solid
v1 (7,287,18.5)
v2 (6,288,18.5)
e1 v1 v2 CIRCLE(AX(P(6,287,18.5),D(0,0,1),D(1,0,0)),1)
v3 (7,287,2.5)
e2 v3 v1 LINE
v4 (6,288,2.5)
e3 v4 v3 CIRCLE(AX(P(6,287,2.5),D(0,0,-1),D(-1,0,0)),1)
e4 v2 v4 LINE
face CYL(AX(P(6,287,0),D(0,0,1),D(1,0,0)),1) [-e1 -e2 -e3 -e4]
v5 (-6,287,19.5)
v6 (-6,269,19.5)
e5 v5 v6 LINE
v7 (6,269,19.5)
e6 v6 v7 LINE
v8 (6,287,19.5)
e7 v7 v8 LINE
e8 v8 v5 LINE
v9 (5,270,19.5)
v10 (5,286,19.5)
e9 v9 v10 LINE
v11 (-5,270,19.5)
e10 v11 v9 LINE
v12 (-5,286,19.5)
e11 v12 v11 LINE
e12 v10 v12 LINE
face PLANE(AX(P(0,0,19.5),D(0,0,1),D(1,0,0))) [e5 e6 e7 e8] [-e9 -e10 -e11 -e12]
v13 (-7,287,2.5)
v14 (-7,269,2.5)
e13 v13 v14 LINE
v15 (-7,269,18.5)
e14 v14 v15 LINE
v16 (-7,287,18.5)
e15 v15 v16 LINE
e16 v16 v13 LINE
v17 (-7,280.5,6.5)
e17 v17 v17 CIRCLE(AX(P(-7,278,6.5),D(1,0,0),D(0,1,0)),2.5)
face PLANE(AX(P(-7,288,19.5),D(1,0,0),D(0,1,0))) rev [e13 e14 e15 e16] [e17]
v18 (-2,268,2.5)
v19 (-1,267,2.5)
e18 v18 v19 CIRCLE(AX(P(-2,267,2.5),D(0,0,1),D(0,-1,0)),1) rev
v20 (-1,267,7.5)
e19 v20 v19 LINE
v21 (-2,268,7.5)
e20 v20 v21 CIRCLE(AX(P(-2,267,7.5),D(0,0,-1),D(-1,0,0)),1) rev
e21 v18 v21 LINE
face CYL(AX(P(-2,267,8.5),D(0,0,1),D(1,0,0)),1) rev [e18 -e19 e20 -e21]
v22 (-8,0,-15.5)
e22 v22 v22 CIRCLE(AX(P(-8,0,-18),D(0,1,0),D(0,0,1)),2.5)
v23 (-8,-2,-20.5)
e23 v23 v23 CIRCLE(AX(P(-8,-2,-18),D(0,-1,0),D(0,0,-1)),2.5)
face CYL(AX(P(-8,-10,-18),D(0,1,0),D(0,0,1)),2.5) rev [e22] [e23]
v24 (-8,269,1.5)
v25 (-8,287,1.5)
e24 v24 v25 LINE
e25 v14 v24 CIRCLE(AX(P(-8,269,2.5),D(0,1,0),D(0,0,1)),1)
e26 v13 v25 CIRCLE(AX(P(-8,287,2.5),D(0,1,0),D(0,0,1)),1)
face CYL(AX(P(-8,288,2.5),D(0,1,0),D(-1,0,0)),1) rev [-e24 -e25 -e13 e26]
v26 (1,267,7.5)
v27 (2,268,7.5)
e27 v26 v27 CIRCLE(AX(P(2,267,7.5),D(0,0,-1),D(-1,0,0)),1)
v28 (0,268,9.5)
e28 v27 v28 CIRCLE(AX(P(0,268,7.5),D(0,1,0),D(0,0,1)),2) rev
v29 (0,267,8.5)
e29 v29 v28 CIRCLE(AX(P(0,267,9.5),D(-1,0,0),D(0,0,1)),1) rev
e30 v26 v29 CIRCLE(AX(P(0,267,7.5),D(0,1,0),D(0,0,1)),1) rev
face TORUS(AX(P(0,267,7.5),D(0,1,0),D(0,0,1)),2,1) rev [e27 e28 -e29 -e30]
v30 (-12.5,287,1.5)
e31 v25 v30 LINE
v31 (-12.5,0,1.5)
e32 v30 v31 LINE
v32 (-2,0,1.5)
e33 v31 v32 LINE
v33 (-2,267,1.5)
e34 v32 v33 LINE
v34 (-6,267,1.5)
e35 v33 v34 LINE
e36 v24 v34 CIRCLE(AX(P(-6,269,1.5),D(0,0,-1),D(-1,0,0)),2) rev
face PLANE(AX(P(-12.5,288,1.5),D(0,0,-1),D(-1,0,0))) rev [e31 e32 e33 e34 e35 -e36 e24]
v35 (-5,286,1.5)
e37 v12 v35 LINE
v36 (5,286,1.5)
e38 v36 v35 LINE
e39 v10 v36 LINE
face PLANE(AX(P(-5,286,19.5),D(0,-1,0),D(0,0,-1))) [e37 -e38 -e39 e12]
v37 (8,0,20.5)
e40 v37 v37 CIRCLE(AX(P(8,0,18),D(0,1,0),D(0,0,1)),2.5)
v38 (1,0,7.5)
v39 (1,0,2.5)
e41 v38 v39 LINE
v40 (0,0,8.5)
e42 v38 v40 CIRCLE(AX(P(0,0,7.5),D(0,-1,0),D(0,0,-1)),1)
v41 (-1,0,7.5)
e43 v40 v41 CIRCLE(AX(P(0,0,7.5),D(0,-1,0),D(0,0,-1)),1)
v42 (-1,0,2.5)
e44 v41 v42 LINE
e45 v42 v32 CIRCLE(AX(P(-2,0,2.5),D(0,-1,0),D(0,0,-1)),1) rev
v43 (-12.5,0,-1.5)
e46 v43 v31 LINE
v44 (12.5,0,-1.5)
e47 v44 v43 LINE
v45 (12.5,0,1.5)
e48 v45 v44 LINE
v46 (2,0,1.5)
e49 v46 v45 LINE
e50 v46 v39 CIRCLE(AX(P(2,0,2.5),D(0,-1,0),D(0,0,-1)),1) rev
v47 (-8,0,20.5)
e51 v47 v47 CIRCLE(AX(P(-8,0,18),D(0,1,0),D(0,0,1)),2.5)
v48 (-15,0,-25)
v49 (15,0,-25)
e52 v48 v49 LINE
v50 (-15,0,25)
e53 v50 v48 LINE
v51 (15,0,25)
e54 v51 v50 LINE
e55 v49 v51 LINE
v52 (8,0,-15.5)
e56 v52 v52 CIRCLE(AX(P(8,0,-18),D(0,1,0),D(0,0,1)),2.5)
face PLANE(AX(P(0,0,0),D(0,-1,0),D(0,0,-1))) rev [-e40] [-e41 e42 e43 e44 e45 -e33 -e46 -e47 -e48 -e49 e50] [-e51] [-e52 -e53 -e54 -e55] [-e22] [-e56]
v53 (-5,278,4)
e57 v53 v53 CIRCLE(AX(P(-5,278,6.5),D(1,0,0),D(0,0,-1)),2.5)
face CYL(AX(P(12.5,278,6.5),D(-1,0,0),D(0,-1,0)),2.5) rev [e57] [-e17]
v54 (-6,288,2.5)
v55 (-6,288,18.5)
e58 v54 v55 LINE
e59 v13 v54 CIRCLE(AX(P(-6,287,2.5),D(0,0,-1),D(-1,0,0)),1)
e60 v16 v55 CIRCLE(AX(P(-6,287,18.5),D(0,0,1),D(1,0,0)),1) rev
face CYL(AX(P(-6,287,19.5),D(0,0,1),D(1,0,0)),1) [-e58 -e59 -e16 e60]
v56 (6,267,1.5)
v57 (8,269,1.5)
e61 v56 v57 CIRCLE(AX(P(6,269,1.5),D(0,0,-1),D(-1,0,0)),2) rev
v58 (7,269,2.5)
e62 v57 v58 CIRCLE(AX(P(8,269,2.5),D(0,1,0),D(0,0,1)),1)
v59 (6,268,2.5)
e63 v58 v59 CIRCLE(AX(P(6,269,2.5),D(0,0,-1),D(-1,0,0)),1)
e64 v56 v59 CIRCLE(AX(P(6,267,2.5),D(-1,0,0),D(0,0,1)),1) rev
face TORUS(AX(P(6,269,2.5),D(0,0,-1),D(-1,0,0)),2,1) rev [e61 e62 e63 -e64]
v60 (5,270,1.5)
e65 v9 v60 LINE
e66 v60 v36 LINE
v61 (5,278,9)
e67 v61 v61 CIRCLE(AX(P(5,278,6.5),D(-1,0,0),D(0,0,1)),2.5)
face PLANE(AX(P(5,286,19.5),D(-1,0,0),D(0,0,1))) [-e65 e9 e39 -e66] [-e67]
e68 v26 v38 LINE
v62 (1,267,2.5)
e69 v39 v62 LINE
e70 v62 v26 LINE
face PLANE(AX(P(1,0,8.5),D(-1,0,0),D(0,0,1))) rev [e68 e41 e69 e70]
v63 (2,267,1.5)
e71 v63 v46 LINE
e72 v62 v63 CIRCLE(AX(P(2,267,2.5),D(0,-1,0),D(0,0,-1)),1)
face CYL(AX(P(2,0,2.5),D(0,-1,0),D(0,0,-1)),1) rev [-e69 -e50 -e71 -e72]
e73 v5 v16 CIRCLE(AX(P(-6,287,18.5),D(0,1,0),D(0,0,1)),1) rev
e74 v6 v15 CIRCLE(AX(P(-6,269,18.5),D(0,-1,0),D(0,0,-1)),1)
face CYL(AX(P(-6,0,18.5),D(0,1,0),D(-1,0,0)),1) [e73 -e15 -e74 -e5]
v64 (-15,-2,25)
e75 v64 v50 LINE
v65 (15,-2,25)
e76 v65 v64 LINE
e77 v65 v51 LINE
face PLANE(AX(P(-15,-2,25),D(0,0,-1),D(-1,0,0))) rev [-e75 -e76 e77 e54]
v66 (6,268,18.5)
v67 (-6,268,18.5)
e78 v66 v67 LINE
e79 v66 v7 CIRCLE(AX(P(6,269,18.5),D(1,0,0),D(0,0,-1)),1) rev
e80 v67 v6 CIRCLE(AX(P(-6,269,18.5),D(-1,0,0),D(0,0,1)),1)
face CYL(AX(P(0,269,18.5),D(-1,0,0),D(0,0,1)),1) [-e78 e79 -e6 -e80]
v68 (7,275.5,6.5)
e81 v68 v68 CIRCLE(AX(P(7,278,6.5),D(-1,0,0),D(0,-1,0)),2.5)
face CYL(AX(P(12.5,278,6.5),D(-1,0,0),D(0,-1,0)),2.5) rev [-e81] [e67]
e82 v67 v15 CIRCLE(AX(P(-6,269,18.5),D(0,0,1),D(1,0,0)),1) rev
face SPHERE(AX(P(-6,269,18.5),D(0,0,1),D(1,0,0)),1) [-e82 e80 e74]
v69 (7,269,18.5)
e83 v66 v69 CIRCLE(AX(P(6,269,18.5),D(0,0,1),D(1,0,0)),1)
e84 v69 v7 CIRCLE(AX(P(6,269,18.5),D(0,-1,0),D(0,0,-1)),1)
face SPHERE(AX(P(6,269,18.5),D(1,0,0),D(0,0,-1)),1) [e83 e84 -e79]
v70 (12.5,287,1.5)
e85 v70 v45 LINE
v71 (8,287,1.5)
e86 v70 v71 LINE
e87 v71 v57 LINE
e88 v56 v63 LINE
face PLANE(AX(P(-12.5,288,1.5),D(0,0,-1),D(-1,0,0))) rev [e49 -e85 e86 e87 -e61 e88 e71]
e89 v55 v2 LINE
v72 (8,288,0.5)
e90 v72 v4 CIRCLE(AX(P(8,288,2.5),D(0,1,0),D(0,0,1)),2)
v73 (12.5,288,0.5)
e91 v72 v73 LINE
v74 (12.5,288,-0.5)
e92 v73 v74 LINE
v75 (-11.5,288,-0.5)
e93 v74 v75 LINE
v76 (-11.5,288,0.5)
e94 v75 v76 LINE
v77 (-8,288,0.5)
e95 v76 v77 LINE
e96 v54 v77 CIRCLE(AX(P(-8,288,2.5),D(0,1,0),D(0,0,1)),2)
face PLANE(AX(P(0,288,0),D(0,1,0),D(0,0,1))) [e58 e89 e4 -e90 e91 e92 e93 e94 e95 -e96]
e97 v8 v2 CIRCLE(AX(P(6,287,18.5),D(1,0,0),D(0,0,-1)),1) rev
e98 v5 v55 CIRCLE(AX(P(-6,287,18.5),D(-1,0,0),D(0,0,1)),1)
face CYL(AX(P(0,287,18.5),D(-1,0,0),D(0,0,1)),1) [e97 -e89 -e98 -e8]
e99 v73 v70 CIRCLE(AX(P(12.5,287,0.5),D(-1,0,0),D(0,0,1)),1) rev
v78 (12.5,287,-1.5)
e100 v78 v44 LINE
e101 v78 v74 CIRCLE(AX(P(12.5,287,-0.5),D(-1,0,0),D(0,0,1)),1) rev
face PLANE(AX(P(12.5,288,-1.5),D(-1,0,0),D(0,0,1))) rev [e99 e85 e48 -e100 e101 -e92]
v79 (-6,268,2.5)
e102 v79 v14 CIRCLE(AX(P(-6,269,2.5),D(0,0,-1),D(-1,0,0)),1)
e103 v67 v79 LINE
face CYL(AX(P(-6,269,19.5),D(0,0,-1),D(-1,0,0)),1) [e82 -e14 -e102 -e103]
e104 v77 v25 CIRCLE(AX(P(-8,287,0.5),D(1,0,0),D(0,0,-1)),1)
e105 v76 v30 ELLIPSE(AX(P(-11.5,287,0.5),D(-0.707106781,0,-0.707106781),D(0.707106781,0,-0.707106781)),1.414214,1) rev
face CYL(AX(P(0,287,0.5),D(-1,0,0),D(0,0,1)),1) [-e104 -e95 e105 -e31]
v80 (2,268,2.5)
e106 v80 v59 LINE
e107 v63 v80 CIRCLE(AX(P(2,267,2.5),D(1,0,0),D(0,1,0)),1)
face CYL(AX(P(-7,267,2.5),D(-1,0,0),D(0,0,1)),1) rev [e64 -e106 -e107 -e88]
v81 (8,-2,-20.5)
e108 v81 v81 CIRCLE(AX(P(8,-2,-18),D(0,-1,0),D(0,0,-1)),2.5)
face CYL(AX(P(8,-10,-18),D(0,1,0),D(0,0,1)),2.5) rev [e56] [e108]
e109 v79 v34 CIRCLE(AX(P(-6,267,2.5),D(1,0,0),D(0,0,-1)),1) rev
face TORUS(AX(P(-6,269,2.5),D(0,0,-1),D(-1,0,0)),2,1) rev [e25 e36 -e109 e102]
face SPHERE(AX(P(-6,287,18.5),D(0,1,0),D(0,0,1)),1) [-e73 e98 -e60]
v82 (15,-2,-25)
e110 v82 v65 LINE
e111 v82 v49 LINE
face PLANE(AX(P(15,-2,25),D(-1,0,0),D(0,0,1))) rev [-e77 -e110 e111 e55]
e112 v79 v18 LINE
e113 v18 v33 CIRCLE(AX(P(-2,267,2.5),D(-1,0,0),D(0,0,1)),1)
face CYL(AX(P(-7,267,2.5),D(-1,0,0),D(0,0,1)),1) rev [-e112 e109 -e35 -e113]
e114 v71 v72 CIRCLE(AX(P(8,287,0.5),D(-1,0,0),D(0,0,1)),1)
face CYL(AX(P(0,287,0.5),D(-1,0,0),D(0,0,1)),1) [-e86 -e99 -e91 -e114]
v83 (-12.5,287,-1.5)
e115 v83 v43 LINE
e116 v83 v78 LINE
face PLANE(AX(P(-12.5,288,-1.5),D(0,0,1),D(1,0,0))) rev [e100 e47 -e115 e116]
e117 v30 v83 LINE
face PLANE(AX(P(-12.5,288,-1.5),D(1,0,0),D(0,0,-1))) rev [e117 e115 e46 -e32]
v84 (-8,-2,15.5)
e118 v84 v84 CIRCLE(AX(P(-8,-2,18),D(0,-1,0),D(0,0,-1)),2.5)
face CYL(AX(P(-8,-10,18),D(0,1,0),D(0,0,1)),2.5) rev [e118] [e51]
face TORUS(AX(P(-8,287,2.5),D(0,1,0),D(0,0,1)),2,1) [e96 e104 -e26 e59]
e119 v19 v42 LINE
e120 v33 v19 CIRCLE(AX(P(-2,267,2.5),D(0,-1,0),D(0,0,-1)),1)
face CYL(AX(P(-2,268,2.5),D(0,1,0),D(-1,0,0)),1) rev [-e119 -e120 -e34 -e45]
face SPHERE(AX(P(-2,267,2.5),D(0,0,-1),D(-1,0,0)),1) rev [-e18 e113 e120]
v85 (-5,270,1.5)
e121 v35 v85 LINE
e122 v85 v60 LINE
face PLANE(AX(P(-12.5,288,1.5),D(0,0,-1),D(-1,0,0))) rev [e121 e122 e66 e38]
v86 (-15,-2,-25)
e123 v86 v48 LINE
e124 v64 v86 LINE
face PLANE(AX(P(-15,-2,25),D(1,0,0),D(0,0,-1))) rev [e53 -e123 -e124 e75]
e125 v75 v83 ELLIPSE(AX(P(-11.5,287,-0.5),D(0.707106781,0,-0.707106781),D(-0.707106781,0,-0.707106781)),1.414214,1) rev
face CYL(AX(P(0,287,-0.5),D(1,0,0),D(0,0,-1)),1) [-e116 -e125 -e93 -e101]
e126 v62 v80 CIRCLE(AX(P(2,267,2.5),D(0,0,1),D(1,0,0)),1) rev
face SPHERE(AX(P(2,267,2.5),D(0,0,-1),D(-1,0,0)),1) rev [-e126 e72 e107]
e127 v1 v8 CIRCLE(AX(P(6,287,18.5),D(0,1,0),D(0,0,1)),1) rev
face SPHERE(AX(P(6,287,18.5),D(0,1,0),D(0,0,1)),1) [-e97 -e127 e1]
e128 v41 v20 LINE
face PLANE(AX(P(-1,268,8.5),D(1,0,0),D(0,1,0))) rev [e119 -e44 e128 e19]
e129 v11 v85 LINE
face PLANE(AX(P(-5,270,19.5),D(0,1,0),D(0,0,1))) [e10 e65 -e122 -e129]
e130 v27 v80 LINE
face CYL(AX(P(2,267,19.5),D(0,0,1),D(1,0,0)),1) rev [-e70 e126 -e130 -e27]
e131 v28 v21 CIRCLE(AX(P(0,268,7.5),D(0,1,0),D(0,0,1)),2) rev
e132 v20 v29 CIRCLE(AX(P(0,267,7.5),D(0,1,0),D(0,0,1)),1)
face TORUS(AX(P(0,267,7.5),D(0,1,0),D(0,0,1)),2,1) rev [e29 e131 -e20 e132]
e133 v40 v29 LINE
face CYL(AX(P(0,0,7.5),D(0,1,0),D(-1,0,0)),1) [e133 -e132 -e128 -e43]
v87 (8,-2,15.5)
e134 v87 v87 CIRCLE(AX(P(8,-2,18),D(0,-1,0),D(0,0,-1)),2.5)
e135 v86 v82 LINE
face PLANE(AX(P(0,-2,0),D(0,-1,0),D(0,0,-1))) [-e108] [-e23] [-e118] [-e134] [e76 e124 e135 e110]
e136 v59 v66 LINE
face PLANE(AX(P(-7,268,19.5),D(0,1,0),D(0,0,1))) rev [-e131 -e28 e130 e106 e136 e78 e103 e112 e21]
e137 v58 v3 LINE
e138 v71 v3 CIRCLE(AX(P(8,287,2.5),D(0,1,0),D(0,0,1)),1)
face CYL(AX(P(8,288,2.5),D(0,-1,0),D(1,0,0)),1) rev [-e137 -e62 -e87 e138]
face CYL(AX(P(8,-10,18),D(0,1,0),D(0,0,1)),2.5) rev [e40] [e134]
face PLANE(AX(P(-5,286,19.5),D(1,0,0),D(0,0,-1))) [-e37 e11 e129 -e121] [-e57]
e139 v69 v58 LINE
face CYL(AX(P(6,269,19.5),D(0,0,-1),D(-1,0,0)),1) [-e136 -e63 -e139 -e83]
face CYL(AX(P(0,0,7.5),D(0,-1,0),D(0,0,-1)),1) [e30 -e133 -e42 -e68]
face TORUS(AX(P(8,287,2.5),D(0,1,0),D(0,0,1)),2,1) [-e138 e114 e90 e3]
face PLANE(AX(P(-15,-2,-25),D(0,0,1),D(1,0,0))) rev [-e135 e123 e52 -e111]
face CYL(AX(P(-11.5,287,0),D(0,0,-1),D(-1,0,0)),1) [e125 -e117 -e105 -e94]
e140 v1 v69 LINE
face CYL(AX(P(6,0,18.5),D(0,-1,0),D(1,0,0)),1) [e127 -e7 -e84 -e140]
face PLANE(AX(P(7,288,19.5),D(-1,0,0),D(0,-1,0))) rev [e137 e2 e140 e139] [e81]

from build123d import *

# Parameters (mm, degrees)
SKETCH1_W               = 25
SKETCH1_H               = 3
BOSS_EXTRUDE1_DEPTH     = 288
SKETCH2_W               = 14
SKETCH2_H               = 20
SKETCH2_W_2             = 10
SKETCH2_H_2             = 16
BOSS_EXTRUDE2_DEPTH     = 18
CUT_EXTRUDE1_DEPTH      = 290.317299863
CUT_EXTRUDE1_DEPTH_BACK = 290.317299863
SKETCH3_R               = 2.5
SKETCH4_W               = 30
SKETCH4_H               = 50
BOSS_EXTRUDE3_DEPTH     = 2
BOSS_EXTRUDE4_DEPTH     = 7
FILLET1_R               = 1
SKETCH6_R               = 2.5
CUT_EXTRUDE2_DEPTH      = 10


with BuildPart() as part:
    # Sketch1 → Boss-Extrude1 (new body)
    with BuildSketch(Plane(origin=(0, 0, 0), x_dir=(1, 0, 0), z_dir=(0, 1, 0))):
        Rectangle(SKETCH1_W, SKETCH1_H)
    extrude(amount=BOSS_EXTRUDE1_DEPTH)

    # Sketch2 → Boss-Extrude2 (add)
    with BuildSketch(Plane.XY.offset(1.5)):
        with Locations((0, 278)):
            Rectangle(SKETCH2_W, SKETCH2_H)
        with Locations((0, 278)):
            Rectangle(SKETCH2_W_2, SKETCH2_H_2, mode=Mode.SUBTRACT)
    extrude(amount=BOSS_EXTRUDE2_DEPTH)

    # Sketch3 → Cut-Extrude1 (cut, two sides: drawn at the far end of the back side and taken through both)
    with BuildSketch(Plane.ZY.offset(7).offset(-CUT_EXTRUDE1_DEPTH_BACK)):
        with Locations(Location((6.5, 278, 0), (0, 0, 180))):
            Circle(SKETCH3_R)
    extrude(amount=CUT_EXTRUDE1_DEPTH + CUT_EXTRUDE1_DEPTH_BACK, mode=Mode.SUBTRACT)

    # Sketch4 → Boss-Extrude3 (add)
    with BuildSketch(Plane(origin=(0, 0, 0), x_dir=(-1, 0, 0), z_dir=(0, -1, 0))):
        Rectangle(SKETCH4_W, SKETCH4_H)
    extrude(amount=BOSS_EXTRUDE3_DEPTH)

    # Sketch5 → Boss-Extrude4 (add)
    with BuildSketch(Plane.XY.offset(1.5)):
        Polygon((0, 0), (1, 0), (1, 268), (0, 268), (-1, 268), (-1, 0), align=None)
    extrude(amount=BOSS_EXTRUDE4_DEPTH)

    # Fillet1
    fillet1_edges = [part.edges().sort_by_distance(p)[0] for p in [
        (-12.5, 288, 0),
        (9.75, 288, 1.5),
        (-9.75, 288, 1.5),
        (7, 278, 19.5),
        (0, 288, 19.5),
        (-7, 278, 19.5),
        (0, 268, 19.5),
        (7, 278, 1.5),
        (7, 268, 10.5),
        (7, 288, 10.5),
        (-7, 278, 1.5),
        (-7, 288, 10.5),
        (-4, 268, 1.5),
        (-7, 268, 10.5),
        (4, 268, 1.5),
        (1, 134, 1.5),
        (1, 268, 5),
        (-1, 134, 1.5),
        (-1, 268, 5),
        (1, 134, 8.5),
        (0, 268, 8.5),
        (-1, 134, 8.5),
        (0, 288, -1.5),
    ]]
    fillet(fillet1_edges, radius=FILLET1_R - 0.0001)  # a hair under: the kernel refuses the full size

    # Sketch6 → Cut-Extrude2 (cut)
    with BuildSketch(Plane(origin=(0, 0, 0), x_dir=(1, 0, 0), z_dir=(0, 1, 0))):
        with Locations(Location((8, 18, 0), (0, 0, 270))):
            Circle(SKETCH6_R)
        with Locations(Location((-8, 18, 0), (0, 0, 270))):
            Circle(SKETCH6_R)
        with Locations(Location((-8, -18, 0), (0, 0, 270))):
            Circle(SKETCH6_R)
        with Locations(Location((8, -18, 0), (0, 0, 270))):
            Circle(SKETCH6_R)
    extrude(amount=-CUT_EXTRUDE2_DEPTH, mode=Mode.SUBTRACT)


solid = part.part
